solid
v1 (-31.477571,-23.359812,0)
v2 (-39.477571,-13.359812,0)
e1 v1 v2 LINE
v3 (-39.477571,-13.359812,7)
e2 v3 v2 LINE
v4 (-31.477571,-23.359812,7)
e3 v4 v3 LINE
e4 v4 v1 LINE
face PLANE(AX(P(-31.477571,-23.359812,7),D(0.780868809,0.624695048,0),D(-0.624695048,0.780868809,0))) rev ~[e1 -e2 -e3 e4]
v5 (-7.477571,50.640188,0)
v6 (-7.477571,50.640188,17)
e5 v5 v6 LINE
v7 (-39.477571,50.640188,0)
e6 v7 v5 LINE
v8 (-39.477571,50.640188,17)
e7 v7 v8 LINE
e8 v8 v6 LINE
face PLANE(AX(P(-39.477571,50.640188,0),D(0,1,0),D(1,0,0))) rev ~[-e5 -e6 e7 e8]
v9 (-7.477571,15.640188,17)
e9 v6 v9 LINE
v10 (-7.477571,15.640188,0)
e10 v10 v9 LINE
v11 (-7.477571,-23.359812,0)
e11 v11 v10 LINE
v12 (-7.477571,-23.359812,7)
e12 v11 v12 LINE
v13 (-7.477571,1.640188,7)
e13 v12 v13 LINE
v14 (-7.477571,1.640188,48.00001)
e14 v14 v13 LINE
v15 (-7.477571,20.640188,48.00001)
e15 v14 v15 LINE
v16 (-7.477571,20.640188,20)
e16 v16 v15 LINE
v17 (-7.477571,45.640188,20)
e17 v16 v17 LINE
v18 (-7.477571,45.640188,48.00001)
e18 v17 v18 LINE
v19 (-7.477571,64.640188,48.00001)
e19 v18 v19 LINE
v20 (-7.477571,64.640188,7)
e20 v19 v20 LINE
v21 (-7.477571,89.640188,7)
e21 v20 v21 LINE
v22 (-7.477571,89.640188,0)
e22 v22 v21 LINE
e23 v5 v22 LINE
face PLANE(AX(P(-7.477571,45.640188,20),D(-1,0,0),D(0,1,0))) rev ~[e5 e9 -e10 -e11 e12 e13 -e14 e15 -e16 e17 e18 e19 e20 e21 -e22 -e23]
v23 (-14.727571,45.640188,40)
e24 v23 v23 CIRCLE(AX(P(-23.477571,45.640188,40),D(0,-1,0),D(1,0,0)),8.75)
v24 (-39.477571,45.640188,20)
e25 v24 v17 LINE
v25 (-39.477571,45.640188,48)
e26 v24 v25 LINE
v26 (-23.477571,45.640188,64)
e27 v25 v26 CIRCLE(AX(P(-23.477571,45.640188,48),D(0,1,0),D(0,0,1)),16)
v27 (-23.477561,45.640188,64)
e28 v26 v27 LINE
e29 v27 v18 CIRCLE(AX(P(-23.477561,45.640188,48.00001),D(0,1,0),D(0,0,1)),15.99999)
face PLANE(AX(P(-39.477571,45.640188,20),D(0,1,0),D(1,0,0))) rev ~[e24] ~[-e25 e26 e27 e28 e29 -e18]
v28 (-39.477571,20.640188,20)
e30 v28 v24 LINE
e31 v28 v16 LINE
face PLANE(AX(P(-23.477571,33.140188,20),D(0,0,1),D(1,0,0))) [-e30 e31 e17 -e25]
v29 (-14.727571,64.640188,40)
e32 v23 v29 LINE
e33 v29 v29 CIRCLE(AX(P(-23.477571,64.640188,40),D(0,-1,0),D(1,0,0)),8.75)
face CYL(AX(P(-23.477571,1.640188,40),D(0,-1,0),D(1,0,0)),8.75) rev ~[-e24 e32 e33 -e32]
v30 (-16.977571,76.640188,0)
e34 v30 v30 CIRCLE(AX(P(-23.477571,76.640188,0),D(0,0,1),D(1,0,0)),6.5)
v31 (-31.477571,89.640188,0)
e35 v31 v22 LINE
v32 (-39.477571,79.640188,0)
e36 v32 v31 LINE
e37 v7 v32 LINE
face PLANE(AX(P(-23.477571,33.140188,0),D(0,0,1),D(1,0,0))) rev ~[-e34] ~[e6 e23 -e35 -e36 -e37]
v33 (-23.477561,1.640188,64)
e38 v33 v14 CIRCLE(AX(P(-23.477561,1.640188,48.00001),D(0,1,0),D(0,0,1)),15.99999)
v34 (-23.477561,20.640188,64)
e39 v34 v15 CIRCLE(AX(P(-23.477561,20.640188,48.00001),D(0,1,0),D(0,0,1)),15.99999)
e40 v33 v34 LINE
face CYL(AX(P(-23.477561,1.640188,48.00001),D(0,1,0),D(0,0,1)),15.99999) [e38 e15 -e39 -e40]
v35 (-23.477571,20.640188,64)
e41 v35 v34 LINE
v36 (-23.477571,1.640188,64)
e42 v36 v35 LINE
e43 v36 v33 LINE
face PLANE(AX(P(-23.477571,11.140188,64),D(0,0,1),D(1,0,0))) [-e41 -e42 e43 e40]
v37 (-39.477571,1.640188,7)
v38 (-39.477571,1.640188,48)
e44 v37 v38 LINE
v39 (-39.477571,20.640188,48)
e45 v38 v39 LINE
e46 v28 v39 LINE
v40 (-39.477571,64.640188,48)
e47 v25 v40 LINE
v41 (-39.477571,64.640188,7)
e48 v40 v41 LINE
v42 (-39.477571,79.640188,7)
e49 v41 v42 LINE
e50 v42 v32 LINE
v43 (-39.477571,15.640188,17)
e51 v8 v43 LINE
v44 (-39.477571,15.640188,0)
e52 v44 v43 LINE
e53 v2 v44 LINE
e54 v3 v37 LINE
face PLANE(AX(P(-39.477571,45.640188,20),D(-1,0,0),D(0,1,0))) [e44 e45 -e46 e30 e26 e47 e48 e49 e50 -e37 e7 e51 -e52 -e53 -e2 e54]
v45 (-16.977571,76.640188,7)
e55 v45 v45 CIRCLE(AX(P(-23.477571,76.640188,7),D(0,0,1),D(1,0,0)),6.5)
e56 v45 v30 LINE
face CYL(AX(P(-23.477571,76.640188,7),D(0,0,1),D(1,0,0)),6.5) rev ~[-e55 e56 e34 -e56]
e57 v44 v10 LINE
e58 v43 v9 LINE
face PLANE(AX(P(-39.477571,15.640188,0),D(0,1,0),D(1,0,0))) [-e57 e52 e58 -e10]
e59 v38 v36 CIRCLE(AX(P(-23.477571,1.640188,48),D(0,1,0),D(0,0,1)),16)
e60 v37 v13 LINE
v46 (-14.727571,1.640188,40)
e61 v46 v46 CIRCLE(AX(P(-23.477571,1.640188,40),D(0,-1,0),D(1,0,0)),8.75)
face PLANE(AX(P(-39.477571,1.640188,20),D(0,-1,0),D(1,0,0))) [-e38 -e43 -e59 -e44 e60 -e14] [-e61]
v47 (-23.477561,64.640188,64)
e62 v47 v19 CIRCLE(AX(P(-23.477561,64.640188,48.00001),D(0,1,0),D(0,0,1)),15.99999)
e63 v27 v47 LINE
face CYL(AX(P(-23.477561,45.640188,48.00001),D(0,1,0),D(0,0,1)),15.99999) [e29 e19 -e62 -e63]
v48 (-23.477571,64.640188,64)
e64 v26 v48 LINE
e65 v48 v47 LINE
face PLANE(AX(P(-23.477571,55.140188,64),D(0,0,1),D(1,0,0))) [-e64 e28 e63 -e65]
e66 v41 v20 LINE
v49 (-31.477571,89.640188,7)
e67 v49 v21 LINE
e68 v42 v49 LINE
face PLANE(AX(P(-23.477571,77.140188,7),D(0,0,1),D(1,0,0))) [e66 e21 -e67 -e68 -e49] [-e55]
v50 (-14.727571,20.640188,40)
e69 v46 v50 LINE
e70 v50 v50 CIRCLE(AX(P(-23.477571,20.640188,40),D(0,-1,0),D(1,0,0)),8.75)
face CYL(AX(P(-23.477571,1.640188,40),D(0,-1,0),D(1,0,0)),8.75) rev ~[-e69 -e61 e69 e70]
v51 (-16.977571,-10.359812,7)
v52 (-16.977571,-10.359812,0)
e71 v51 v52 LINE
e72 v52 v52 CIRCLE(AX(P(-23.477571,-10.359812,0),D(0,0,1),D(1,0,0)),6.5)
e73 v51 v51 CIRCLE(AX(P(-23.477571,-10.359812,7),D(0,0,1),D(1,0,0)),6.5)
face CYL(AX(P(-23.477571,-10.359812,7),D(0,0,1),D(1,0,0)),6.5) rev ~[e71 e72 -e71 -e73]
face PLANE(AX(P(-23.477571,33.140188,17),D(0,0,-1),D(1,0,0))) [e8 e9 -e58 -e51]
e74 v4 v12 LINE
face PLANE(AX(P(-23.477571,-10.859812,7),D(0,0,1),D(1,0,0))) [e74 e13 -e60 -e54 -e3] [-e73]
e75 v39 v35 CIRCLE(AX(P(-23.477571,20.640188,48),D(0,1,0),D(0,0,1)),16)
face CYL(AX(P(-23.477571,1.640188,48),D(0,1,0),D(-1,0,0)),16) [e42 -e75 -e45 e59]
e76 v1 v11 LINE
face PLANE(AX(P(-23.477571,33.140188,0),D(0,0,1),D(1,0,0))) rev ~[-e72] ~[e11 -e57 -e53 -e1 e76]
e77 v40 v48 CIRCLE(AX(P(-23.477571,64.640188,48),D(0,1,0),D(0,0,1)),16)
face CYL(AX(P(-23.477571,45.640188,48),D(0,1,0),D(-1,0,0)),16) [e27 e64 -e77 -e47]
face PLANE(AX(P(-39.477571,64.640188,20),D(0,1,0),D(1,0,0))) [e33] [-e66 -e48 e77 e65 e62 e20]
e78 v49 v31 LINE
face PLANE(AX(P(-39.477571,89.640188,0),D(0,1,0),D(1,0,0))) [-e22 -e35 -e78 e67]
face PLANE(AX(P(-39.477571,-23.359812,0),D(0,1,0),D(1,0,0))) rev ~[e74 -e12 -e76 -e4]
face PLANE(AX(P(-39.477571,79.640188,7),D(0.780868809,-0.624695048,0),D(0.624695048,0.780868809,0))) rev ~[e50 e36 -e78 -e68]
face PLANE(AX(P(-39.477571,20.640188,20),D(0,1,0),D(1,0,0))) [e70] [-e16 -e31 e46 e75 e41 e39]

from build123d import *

# Parameters (mm, degrees)
F0_W      = 32
F0_H      = 113
F1_DEPTH  = 20
F2_W      = 32
F2_H      = 25
F3_DEPTH  = 13
F4_W      = 32
F4_H      = 35
F5_DEPTH  = 17
F6_W      = 32
F6_H      = 19
F7_DEPTH  = 44
F8_R      = 16
F9_R      = 15.99999
F10_R     = 16
F11_R     = 15.99999
F12_R     = 6.5
F13_DEPTH = 13
F14_R     = 6.5
F15_DEPTH = 13
F17_DEPTH = 25
F19_DEPTH = 25
F20_R     = 8.75
F21_DEPTH = 100


# Not quite as in the source:
# - a fillet or chamfer is up to 0.001 mm smaller than in the source, because OpenCascade refuses the exact size


with BuildPart() as f1:
    # F0 (on Top) → F1 (new body)
    with BuildSketch(Plane.XY):
        with Locations((-23.4775710851, 33.1401875504)):
            Rectangle(F0_W, F0_H)
    extrude(amount=F1_DEPTH)

    # F2 (on face) → F3 (cut)
    with BuildSketch(Plane.XY.offset(20)):
        with Locations((-23.4775710851, 77.1401875504)):
            Rectangle(F2_W, F2_H)
        with Locations((-23.4775710851, -10.8598124496)):
            Rectangle(F2_W, F2_H)
    extrude(amount=-F3_DEPTH, mode=Mode.SUBTRACT)

    # F4 (on face) → F5 (cut)
    with BuildSketch(Plane(origin=(0, 0, 0), x_dir=(1, 0, 0), z_dir=(0, 0, -1))):
        with Locations((-23.4775710851, -33.1401875504)):
            Rectangle(F4_W, F4_H)
    extrude(amount=-F5_DEPTH, mode=Mode.SUBTRACT)

    # F6 (on face) → F7 (join)
    with BuildSketch(Plane.XY.offset(20)):
        with Locations((-23.4775710851, 55.1401875504)):
            Rectangle(F6_W, F6_H)
        with Locations((-23.4775710851, 11.1401875504)):
            Rectangle(F6_W, F6_H)
    extrude(amount=F7_DEPTH)

    # F8
    f8_edges = [f1.edges().sort_by_distance(p)[0] for p in [
        (-39.477571, 55.140188, 64),
    ]]
    fillet(f8_edges, radius=F8_R)

    # F9 (radius 16 in the source; OpenCascade refuses exactly that, so slightly less here)
    f9_edges = [f1.edges().sort_by_distance(p)[0] for p in [
        (-7.477571, 55.140188, 64),
    ]]
    fillet(f9_edges, radius=F9_R)

    # F10
    f10_edges = [f1.edges().sort_by_distance(p)[0] for p in [
        (-39.477571, 11.140188, 64),
    ]]
    fillet(f10_edges, radius=F10_R)

    # F11 (radius 16 in the source; OpenCascade refuses exactly that, so slightly less here)
    f11_edges = [f1.edges().sort_by_distance(p)[0] for p in [
        (-7.477571, 11.140188, 64),
    ]]
    fillet(f11_edges, radius=F11_R)

    # F12 (on face) → F13 (cut)
    with BuildSketch(Plane.XY.offset(7)):
        with Locations((-23.4775710851, -10.3598124496)):
            Circle(F12_R)
    extrude(amount=-F13_DEPTH, mode=Mode.SUBTRACT)

    # F14 (on face) → F15 (cut)
    with BuildSketch(Plane.XY.offset(7)):
        with Locations((-23.4775710851, 76.6401875504)):
            Circle(F14_R)
    extrude(amount=-F15_DEPTH, mode=Mode.SUBTRACT)

    # F16 (on face) → F17 (cut)
    with BuildSketch(Plane.XY.offset(7)):
        Polygon((-39.4775710851, -13.3598124496), (-39.4775710851, -23.3598124496), (-31.4775710851, -23.3598124496), align=None)
    extrude(amount=-F17_DEPTH, mode=Mode.SUBTRACT)

    # F18 (on face) → F19 (cut)
    with BuildSketch(Plane.XY.offset(7)):
        Polygon((-31.4775710851, 89.6401875504), (-39.4775710851, 89.6401875504), (-39.4775710851, 79.6401875504), align=None)
    extrude(amount=-F19_DEPTH, mode=Mode.SUBTRACT)

    # F20 (on face) → F21 (cut)
    with BuildSketch(Plane.XZ.offset(-1.6401875504)):
        with Locations((-23.4775710851, 40)):
            Circle(F20_R)
    extrude(amount=-F21_DEPTH, mode=Mode.SUBTRACT)


solid = f1.part
